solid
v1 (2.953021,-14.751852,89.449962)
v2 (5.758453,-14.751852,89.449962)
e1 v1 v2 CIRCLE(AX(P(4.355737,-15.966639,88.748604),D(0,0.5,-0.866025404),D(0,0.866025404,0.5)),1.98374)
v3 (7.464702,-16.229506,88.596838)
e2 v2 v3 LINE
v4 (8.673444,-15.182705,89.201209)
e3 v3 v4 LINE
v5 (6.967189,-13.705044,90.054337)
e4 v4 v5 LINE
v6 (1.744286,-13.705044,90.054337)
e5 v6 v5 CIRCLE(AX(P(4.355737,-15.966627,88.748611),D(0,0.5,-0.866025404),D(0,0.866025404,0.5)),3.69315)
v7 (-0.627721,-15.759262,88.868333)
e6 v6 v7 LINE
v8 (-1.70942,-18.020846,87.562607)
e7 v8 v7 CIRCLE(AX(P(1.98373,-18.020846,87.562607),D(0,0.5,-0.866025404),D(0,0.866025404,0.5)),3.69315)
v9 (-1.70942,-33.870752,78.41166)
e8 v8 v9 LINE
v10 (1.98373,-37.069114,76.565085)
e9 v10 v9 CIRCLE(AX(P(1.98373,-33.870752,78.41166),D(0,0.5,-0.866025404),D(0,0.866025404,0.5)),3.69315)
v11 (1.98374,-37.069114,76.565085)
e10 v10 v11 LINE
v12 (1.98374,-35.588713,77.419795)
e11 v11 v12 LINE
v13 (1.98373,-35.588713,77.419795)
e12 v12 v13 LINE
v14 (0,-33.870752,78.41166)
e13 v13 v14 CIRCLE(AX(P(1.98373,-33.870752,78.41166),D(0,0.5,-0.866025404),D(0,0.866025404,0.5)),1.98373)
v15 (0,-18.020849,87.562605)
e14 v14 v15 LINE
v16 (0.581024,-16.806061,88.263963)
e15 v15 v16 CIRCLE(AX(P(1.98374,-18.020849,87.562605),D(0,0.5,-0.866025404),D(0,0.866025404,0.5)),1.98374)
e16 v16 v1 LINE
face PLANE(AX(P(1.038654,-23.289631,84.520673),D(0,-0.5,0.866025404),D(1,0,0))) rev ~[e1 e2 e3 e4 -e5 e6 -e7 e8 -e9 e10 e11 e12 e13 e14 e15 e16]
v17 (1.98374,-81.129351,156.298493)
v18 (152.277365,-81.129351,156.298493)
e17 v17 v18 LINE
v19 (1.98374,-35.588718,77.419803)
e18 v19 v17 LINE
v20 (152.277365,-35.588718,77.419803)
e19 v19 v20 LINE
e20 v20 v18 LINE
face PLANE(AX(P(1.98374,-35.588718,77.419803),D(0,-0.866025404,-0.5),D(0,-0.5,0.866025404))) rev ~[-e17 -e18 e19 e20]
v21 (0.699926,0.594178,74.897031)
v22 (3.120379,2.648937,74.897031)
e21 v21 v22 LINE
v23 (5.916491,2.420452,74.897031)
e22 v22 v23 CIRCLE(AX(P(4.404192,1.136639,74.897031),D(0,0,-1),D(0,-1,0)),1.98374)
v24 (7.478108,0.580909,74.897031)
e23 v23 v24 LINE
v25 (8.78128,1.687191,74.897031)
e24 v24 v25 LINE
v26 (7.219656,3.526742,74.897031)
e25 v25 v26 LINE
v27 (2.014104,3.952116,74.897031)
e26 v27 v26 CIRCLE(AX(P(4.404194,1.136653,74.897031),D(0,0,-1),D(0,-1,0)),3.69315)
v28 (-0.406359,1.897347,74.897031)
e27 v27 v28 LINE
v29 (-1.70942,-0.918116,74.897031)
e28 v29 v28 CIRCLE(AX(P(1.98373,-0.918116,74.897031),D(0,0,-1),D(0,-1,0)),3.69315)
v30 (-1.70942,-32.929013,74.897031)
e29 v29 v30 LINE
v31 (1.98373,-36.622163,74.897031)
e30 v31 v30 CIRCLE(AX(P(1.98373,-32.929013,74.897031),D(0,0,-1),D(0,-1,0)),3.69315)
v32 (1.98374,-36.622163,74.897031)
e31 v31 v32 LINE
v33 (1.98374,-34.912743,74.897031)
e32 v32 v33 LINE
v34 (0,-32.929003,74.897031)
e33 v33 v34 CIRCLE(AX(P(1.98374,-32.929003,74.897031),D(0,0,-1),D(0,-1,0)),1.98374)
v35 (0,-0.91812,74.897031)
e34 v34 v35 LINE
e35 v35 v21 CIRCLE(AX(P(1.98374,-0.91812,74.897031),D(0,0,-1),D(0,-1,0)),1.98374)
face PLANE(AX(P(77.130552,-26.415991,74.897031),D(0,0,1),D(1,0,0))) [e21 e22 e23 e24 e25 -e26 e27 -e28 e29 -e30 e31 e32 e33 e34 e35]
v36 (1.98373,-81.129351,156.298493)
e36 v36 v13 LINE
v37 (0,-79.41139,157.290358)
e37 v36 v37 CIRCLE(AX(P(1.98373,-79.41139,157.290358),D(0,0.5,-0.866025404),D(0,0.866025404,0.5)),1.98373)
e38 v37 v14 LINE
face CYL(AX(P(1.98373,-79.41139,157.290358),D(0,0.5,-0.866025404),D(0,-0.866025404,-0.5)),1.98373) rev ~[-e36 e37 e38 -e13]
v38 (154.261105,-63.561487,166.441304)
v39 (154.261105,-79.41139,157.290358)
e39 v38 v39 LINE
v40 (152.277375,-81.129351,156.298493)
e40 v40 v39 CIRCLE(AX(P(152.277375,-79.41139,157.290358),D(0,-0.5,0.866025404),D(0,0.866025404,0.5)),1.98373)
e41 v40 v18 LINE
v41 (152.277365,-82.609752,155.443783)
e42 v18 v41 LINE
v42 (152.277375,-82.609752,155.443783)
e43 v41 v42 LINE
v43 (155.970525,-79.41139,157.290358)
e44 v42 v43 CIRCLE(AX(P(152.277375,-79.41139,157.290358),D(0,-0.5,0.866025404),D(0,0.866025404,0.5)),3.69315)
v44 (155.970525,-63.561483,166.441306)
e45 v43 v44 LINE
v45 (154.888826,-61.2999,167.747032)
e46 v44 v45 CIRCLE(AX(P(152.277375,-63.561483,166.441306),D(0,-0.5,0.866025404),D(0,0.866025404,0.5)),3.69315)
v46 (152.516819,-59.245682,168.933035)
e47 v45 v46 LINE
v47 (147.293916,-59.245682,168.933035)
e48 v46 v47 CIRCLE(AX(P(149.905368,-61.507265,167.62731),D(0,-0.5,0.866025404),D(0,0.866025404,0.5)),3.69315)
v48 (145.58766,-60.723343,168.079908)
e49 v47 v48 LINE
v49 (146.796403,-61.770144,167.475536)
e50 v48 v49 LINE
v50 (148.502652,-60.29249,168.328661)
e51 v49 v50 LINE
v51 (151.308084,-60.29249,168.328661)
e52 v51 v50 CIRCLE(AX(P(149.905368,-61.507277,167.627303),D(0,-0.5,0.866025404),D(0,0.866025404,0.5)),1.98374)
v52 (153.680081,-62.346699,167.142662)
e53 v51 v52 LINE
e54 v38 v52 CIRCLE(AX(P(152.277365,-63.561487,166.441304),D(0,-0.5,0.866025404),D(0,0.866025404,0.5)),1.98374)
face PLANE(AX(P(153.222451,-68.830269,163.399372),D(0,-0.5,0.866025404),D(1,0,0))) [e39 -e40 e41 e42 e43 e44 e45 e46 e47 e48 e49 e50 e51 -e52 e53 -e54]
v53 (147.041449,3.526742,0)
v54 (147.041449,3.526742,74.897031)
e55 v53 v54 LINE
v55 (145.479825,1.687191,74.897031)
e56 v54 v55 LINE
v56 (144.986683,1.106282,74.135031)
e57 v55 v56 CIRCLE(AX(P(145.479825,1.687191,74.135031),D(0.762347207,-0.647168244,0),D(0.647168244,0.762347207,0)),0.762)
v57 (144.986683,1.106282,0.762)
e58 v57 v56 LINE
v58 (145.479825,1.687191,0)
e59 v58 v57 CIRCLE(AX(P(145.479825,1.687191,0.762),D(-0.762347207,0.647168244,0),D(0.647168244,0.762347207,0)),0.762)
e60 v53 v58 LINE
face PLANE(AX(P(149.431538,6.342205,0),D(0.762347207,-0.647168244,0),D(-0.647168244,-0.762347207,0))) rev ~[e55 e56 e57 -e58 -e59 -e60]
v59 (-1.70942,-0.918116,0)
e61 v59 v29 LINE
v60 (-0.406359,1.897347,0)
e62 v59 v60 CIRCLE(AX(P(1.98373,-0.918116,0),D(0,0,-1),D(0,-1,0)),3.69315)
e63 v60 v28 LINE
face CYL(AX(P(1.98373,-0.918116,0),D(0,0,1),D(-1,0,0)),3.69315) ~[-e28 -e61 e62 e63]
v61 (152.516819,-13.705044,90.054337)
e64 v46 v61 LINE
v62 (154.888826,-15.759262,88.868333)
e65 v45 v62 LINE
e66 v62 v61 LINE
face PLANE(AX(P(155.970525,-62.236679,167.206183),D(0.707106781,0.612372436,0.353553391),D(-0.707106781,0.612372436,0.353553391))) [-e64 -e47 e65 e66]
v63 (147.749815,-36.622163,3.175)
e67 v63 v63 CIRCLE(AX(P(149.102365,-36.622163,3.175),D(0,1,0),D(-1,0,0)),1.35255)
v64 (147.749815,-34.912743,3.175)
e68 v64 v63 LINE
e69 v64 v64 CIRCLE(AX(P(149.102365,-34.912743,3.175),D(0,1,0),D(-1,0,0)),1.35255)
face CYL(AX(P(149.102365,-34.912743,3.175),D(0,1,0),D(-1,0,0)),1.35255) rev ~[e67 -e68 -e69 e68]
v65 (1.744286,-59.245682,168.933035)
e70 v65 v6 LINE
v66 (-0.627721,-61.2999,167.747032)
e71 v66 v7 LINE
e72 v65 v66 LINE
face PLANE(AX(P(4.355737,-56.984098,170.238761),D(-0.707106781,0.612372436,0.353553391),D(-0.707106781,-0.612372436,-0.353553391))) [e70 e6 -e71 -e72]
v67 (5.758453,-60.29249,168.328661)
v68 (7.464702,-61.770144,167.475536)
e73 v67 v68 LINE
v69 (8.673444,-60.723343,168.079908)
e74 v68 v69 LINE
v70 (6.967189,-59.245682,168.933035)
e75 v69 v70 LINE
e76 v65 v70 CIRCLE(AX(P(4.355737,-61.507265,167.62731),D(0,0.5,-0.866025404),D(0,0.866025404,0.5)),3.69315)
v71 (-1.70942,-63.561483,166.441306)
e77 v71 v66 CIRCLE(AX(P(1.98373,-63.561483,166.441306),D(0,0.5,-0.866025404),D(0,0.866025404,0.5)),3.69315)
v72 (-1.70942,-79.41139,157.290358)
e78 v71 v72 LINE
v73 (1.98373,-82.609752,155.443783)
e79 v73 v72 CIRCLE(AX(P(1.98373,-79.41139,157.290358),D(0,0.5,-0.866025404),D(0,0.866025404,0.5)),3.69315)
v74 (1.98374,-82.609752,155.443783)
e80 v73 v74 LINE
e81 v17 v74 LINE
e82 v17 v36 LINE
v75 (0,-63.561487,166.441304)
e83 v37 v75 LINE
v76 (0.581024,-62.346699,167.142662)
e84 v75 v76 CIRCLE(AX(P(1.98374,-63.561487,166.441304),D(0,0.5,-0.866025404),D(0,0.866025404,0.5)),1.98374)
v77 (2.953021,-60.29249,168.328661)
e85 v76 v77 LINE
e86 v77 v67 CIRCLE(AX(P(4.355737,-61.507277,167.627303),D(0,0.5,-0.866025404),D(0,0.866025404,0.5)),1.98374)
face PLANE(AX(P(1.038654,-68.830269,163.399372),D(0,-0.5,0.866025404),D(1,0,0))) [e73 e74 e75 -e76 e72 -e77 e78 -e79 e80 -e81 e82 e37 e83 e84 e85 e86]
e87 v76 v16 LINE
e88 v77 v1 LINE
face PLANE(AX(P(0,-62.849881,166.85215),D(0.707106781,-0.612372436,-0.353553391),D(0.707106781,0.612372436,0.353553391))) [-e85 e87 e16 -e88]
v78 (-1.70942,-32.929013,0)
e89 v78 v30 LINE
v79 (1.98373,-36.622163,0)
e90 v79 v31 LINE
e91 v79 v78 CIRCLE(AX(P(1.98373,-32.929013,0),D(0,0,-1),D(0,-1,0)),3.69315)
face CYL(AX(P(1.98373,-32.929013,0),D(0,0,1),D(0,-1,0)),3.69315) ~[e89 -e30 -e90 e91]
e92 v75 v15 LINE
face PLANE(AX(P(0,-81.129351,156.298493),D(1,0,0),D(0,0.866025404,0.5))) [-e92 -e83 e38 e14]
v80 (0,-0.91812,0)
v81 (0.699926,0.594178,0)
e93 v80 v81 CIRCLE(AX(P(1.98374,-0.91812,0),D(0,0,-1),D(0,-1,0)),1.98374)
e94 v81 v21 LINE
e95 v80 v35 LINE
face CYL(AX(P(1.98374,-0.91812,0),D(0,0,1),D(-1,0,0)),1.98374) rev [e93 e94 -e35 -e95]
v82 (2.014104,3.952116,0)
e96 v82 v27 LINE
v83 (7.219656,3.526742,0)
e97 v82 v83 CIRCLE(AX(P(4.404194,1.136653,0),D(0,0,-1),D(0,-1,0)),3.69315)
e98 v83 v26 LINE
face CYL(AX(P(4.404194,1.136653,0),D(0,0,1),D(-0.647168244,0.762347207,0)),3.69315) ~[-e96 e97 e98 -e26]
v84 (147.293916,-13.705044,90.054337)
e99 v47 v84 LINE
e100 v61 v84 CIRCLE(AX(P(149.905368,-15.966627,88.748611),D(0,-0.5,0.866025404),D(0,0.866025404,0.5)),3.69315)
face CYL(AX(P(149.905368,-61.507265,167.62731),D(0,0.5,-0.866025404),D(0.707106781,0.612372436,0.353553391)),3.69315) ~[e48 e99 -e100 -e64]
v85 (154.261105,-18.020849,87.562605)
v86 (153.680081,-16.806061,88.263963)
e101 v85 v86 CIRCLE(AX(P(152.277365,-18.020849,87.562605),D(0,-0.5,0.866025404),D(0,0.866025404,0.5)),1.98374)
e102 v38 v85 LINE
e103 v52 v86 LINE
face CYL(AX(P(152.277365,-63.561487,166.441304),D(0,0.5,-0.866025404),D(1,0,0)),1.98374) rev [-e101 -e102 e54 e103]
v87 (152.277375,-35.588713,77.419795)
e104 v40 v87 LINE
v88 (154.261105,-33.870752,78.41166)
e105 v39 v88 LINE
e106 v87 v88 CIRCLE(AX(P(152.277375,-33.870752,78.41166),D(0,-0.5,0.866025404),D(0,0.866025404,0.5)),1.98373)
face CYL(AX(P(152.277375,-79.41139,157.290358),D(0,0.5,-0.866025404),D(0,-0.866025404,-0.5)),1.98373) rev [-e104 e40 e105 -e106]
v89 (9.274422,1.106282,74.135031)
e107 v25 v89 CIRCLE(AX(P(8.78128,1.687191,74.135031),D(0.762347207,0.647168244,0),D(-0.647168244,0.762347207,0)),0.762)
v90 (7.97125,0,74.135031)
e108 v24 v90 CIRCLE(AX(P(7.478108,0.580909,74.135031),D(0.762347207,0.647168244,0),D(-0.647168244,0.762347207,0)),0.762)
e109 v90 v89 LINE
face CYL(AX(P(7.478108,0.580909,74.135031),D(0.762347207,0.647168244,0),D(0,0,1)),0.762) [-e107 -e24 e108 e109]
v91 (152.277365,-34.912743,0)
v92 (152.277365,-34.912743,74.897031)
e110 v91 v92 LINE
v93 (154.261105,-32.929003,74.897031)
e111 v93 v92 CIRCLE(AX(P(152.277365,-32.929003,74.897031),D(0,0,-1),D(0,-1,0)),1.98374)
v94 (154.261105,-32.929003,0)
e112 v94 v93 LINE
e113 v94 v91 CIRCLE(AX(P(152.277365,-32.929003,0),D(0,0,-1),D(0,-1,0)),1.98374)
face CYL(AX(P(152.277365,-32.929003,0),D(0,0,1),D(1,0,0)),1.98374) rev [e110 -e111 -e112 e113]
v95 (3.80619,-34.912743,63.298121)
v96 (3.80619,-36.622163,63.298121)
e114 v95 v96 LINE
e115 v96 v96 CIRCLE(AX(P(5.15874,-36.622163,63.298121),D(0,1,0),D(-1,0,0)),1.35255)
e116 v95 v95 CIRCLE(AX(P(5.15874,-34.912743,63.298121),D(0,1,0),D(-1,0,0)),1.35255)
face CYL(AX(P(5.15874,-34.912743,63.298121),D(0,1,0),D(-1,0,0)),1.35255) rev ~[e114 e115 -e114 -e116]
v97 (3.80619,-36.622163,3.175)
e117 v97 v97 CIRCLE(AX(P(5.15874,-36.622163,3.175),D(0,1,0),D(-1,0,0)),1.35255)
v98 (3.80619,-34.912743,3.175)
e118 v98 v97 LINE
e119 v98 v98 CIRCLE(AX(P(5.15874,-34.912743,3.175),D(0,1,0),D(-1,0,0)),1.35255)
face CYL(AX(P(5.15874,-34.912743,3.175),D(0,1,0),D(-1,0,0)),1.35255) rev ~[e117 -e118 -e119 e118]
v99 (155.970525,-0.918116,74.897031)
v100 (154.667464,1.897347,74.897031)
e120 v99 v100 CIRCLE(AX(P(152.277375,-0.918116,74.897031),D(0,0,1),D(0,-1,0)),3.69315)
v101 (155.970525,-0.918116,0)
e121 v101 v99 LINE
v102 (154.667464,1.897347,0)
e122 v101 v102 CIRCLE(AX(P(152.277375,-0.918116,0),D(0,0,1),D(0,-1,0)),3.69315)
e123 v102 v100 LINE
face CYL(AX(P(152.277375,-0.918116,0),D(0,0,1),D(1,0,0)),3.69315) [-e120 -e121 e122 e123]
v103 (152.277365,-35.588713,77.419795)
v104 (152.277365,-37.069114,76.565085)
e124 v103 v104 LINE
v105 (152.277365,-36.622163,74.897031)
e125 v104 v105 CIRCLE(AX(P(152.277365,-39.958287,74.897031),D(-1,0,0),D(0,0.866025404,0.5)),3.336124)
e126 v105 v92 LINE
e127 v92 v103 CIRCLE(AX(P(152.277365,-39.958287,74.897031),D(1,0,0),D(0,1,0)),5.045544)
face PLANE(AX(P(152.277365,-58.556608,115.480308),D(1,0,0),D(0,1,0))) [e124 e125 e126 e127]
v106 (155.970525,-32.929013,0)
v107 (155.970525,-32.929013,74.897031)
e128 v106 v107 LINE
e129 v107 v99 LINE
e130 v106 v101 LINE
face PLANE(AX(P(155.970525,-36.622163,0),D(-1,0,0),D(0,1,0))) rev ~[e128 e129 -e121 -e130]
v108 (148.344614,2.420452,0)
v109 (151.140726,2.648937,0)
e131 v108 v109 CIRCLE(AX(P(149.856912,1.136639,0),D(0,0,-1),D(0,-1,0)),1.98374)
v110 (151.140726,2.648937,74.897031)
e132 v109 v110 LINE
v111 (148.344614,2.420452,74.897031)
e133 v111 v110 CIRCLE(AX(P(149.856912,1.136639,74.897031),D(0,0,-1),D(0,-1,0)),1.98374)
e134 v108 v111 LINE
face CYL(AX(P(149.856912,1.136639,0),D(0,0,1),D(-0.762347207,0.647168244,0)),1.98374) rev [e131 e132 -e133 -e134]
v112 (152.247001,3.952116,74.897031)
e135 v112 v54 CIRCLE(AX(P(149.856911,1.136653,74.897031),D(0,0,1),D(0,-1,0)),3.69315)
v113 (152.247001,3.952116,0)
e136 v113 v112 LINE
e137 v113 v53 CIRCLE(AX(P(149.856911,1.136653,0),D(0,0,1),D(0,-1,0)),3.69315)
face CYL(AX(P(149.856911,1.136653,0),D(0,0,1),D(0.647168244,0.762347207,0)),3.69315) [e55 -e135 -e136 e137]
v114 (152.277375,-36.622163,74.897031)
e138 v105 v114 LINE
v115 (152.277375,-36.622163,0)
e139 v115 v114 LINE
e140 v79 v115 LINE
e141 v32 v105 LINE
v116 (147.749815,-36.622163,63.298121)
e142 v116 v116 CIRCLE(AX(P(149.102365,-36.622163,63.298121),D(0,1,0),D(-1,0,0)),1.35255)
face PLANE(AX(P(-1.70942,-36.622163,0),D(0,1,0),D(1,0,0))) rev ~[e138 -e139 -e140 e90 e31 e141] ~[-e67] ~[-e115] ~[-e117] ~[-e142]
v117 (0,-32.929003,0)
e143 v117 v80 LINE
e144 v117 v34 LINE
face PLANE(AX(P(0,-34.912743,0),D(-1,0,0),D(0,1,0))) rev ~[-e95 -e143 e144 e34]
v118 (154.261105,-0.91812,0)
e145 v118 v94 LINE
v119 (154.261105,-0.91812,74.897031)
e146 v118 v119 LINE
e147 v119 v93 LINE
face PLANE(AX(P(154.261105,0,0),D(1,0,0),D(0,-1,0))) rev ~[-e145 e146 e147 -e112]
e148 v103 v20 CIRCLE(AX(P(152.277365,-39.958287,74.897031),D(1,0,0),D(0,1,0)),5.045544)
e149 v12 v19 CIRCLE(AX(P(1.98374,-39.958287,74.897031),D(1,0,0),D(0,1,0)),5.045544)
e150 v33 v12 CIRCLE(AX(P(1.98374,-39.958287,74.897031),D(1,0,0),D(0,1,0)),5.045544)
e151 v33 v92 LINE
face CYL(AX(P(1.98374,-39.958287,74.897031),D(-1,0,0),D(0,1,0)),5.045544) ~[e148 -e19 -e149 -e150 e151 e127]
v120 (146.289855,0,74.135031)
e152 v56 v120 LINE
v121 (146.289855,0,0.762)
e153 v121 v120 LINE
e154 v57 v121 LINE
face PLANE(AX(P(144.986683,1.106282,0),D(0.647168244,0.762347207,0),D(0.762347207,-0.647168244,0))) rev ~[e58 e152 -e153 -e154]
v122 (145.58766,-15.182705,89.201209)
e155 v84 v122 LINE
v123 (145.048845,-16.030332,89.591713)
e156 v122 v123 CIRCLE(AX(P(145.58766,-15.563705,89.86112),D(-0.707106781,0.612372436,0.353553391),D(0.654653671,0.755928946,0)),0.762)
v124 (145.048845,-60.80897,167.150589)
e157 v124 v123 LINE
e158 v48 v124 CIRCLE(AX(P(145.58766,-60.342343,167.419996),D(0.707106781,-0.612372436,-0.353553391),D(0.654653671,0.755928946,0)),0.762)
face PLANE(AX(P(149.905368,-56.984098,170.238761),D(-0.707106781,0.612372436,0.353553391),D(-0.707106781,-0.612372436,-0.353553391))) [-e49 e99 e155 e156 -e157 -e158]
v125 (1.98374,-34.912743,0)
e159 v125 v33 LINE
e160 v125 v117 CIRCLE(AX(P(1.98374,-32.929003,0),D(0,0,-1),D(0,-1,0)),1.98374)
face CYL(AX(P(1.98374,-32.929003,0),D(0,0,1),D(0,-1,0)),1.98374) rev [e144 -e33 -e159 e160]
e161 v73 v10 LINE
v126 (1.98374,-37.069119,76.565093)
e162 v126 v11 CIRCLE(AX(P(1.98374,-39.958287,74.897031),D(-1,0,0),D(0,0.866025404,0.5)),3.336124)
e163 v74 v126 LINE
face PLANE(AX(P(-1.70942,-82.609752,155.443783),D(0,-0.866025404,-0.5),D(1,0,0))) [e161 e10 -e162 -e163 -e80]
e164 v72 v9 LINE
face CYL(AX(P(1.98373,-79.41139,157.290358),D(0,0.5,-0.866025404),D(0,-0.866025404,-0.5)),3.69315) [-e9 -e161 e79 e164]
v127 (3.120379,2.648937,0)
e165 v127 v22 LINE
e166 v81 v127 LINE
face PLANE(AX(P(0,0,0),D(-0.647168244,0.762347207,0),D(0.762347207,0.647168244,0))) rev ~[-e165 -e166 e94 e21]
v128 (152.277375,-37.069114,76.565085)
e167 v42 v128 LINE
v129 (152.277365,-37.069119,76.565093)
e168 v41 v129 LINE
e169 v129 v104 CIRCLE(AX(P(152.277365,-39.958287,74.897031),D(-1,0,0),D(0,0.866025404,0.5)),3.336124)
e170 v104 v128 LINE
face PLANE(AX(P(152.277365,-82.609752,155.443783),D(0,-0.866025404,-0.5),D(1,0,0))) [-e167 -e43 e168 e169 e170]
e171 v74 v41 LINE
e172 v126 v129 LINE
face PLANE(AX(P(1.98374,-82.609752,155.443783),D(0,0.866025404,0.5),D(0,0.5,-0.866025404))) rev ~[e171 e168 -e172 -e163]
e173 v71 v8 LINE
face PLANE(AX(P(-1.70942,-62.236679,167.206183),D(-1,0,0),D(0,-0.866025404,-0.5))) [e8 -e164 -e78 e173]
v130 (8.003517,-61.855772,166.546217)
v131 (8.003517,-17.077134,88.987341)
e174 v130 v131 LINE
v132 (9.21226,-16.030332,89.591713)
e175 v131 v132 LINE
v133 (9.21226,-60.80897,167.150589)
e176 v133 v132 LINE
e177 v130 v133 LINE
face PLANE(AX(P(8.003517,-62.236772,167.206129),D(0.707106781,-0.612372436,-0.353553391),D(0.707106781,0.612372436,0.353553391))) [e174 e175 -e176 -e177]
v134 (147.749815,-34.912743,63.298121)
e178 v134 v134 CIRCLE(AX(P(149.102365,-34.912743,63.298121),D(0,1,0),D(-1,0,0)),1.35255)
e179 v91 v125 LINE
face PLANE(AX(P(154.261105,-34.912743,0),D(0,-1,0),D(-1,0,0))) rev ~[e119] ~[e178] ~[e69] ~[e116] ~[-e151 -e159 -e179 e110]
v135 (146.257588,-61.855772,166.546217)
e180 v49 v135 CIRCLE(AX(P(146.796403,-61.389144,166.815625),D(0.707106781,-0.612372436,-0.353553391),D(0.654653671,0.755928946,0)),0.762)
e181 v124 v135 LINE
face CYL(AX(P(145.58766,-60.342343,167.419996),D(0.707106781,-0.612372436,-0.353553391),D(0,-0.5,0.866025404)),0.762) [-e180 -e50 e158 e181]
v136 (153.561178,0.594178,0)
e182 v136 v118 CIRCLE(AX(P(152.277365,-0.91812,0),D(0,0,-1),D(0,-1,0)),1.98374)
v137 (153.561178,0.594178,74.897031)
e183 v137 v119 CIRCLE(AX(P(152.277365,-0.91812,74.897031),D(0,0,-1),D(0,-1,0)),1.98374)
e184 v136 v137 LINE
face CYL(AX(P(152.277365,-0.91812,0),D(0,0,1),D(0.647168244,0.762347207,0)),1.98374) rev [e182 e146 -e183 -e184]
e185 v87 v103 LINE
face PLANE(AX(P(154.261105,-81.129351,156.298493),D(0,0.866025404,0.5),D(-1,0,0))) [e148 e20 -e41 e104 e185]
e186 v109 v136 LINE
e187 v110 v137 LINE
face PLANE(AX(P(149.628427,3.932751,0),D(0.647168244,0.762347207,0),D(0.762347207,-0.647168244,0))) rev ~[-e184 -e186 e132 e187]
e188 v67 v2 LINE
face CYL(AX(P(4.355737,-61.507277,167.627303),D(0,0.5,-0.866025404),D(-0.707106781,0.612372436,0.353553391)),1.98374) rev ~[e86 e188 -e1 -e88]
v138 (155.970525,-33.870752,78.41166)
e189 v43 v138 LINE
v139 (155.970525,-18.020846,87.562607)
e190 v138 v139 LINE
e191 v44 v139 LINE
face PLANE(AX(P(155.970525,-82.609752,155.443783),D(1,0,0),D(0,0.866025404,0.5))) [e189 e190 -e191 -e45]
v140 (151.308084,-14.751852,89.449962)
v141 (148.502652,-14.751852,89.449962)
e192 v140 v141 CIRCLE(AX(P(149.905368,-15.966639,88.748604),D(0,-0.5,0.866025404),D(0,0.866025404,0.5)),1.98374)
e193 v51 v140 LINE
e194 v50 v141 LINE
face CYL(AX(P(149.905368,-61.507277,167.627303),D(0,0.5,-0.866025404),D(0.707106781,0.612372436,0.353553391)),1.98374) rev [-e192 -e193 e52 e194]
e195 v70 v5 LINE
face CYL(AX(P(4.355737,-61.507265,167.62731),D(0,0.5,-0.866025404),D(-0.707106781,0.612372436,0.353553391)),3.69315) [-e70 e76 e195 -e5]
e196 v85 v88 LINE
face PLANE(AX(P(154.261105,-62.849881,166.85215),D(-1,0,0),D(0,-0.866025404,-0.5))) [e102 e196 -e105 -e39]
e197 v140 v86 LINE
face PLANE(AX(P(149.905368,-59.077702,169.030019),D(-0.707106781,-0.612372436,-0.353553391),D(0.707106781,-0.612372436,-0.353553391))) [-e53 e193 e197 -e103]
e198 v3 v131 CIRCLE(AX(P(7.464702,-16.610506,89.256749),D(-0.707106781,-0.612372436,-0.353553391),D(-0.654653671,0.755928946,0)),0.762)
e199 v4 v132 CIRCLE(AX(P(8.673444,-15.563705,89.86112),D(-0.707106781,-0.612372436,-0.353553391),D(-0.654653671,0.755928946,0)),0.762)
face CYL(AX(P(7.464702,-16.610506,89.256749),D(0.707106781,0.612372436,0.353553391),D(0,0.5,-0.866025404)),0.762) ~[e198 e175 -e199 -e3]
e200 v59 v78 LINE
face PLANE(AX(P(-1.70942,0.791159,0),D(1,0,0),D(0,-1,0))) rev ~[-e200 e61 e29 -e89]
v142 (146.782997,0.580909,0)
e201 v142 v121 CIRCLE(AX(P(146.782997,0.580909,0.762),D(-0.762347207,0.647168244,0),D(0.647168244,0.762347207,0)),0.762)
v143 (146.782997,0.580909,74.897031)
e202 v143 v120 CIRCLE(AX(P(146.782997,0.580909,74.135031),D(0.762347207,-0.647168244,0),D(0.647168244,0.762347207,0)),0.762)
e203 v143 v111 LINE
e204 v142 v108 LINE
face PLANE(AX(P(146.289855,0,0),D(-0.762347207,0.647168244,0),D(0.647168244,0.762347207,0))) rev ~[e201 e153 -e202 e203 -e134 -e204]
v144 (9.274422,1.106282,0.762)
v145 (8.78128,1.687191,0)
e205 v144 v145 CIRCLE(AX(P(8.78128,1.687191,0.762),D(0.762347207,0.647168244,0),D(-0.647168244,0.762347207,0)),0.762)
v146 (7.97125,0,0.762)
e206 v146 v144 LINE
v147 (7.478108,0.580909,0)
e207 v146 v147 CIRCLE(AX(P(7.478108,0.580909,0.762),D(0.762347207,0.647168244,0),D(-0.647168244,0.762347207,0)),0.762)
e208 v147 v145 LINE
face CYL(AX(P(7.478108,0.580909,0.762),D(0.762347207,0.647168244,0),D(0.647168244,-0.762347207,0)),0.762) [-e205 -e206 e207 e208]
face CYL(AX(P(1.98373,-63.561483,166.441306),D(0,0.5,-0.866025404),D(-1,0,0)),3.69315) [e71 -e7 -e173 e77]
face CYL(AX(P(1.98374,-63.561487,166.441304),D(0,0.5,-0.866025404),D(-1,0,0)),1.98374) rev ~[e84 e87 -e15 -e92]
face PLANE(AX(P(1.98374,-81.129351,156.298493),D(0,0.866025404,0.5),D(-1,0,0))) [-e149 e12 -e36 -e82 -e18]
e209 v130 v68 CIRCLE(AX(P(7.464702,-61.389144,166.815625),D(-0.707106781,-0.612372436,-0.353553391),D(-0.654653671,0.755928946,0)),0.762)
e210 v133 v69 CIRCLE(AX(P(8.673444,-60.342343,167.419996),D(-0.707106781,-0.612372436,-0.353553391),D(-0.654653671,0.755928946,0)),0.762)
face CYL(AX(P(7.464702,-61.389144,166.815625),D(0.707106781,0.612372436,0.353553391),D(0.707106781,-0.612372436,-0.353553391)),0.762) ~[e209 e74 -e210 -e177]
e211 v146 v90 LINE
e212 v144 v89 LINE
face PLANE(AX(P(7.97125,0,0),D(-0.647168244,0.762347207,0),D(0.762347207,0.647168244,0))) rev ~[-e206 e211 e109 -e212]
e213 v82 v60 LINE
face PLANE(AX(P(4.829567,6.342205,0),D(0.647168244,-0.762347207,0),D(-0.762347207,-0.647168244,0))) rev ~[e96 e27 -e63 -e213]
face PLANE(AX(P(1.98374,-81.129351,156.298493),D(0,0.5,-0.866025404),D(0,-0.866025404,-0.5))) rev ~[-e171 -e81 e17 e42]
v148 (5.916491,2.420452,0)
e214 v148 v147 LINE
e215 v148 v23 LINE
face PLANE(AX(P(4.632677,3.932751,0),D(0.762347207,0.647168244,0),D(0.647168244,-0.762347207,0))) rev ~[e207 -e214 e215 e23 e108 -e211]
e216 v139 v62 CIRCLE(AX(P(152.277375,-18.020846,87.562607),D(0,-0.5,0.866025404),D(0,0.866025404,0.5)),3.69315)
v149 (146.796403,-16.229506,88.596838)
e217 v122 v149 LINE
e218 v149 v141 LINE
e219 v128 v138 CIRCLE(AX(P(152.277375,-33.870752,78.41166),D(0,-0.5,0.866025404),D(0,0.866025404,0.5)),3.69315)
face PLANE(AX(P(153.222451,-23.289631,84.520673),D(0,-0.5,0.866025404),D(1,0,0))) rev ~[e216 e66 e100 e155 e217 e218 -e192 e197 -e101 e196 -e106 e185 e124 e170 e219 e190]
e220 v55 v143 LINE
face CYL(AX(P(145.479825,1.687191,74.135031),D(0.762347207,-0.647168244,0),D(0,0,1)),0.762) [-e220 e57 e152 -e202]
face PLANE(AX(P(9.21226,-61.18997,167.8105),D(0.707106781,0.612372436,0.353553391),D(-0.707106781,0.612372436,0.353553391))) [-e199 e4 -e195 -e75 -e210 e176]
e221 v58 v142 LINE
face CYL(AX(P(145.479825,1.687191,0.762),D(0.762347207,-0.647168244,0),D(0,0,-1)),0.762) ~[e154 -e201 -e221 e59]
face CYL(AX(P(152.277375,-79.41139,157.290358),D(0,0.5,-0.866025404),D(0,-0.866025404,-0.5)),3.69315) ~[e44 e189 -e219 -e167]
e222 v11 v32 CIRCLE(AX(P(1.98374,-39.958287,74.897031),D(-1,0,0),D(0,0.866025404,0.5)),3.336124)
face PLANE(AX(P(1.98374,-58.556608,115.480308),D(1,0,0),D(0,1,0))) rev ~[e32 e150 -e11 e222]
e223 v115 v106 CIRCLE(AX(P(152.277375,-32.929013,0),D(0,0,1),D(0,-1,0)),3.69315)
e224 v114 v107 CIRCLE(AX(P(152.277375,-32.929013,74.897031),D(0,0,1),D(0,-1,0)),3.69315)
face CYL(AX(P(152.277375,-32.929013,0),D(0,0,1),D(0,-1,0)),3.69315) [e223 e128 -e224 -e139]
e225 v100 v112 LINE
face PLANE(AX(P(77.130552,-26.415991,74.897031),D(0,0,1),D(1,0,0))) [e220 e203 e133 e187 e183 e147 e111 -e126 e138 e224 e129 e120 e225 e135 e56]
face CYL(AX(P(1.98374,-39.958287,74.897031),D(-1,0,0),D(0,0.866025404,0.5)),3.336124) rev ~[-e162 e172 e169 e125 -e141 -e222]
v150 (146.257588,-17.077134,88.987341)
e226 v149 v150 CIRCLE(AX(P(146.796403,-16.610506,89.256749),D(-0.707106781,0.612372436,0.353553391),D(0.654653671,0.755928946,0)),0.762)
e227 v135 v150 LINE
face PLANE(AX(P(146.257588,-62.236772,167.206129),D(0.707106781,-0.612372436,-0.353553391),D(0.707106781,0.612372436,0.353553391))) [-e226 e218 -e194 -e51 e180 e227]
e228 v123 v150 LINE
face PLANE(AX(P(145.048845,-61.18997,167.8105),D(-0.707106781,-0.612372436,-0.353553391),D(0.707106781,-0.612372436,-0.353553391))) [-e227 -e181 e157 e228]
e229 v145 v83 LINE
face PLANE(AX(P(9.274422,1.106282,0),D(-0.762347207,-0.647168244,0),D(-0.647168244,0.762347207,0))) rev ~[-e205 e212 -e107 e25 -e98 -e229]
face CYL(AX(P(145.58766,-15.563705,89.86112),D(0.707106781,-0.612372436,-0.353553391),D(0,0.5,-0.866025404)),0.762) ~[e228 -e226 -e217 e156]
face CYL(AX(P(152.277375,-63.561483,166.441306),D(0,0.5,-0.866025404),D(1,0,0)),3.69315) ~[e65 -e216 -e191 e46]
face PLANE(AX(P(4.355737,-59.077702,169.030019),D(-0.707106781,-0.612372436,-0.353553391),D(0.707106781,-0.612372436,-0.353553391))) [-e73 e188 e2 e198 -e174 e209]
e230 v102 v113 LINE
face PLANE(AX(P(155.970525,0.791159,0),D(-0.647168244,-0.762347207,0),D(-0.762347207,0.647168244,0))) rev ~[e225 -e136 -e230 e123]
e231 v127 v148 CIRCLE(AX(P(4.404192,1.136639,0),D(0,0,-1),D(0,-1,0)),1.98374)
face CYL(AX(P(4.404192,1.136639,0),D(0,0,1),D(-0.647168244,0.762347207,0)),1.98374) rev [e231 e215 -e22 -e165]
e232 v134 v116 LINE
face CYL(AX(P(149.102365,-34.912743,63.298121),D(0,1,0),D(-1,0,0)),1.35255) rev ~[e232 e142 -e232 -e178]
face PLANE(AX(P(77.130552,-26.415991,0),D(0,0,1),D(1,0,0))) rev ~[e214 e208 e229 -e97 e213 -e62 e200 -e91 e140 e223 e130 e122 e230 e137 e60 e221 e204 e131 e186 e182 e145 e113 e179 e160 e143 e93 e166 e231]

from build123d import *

# Parameters (mm, degrees)
F1_DEPTH  = 74.8970308
F2_R      = 1.35255
F3_DEPTH  = 1.70942
F8_DEPTH  = 150.2936248359
F10_DEPTH = 91.0812758
F11_R     = 3.69315
F12_R     = 1.98373
F12_R_2   = 1.98374
F13_R     = 0.762


# Not quite as in the source:
# - a fillet or chamfer is up to 0.001 mm smaller than in the source, because OpenCascade refuses the exact size


with BuildPart() as f1:
    # F0 (on Top) → F1 (new body)
    with BuildSketch(Plane.XY):
        Polygon((0, -34.9127429517), (0, 0), (4.6326774961, 3.932751029), (7.9712502047, 0), (9.2744217668, 1.1062823402), (4.8295667179, 6.3422049313), (-1.70942, 0.7911587457), (-1.70942, -36.6221629517), (155.9705248359, -36.6221629517), (155.9705248359, 0.7911587457), (149.4315381179, 6.3422049313), (144.9866830691, 1.1062823402), (146.2898546311, 0), (149.6284273398, 3.932751029), (154.2611048359, 0), (154.2611048359, -34.9127429517), align=None)
    extrude(amount=F1_DEPTH)

    # F2 (on face) → F3 (cut, through all)
    with BuildSketch(Plane(origin=(0, -34.9127429517, 0), x_dir=(-1, 0, 0), z_dir=(0, 1, 0))):
        with Locations((-5.15874, 3.175)):
            Circle(F2_R)
        with Locations((-5.15874, 63.2981208)):
            Circle(F2_R)
        with Locations((-149.1023648359, 63.2981208)):
            Circle(F2_R)
        with Locations((-149.1023648359, 3.175)):
            Circle(F2_R)
    extrude(amount=-F3_DEPTH, mode=Mode.SUBTRACT)

    # F7 (on offset) → F8 (join, through all)
    with BuildSketch(Plane.YZ.offset(1.98374)):
        with BuildLine():
            Line((-36.6221629517, 74.8970308), (-34.9127429517, 74.8970308))
            ThreePointArc((-34.9127429517, 74.8970308), (-35.0846656967, 76.2029136969), (-35.5887176805, 77.4198028324))
            Line((-35.5887176805, 77.4198028324), (-81.129350806, 156.2984932146))
            Line((-81.129350806, 156.2984932146), (-82.6097519517, 155.4437832146))
            Line((-82.6097519517, 155.4437832146), (-37.0691188262, 76.5650928324))
            ThreePointArc((-37.0691188262, 76.5650928324), (-36.7358386226, 75.7604832448), (-36.6221629517, 74.8970308))
        make_face()
    extrude(amount=F8_DEPTH)

    # F9 (on face) → F10 (join)
    with BuildSketch(Plane(origin=(0, -87.96157055, 152.3539093062), x_dir=(1, 0, 0), z_dir=(0, -0.5, 0.8660254038))):
        Polygon((-1.7094199999, 6.1797478168), (1.98374, 6.1797478168), (1.98374, 7.8891678168), (0, 7.8891678168), (1e-10, 28.9964815425), (4.3557372213, 33.3522187635), (8.0035172575, 29.7044387269), (9.2122597315, 30.9131812007), (4.3557372215, 35.7697037112), (-1.7094199999, 29.7045464903), align=None)
        Polygon((152.277364836, 7.8891678168), (152.277364836, 6.1797478168), (155.9705248359, 6.1797478168), (155.9705248359, 29.7045464903), (149.9053676148, 35.7697037114), (145.0488451045, 30.9131812012), (146.2575875784, 29.7044387273), (149.9053676148, 33.3522187636), (154.2611048359, 28.9964815425), (154.2611048359, 7.8891678168), align=None)
    extrude(amount=-F10_DEPTH)

    # F11 (radius 3.69316 in the source; OpenCascade refuses exactly that, so slightly less here)
    f11_edges = [f1.edges().sort_by_distance(p)[0] for p in [
        (149.431538, 6.342205, 37.448515),
        (155.970525, 0.791159, 37.448515),
        (155.970525, -36.622163, 37.448515),
        (-1.70942, -36.622163, 37.448515),
        (-1.70942, 0.791159, 37.448515),
        (4.829567, 6.342205, 37.448515),
        (149.905368, -34.21378, 130.799412),
        (155.970525, -39.46636, 127.766833),
        (155.970525, -59.839433, 116.004434),
        (-1.70942, -59.839433, 116.004434),
        (-1.70942, -39.46636, 127.766833),
        (4.355737, -34.21378, 130.799412),
    ]]
    fillet(f11_edges, radius=F11_R)

    # F12#9 (call 1 of 12: OpenCascade refuses the feature's edges together) (radius 1.98374 in the source; OpenCascade refuses exactly that, so slightly less here)
    f12_9_edges = [f1.edges().sort_by_distance(p)[0] for p in [
        (0, -58.359032, 116.859144),
    ]]
    fillet(f12_9_edges, radius=F12_R)

    # F12#10 (call 2 of 12) (radius 1.98374 in the source; OpenCascade refuses exactly that, so slightly less here)
    f12_10_edges = [f1.edges().sort_by_distance(p)[0] for p in [
        (154.261105, -58.359032, 116.859144),
    ]]
    fillet(f12_10_edges, radius=F12_R)

    # F12#11 (call 3 of 12)
    f12_11_edges = [f1.edges().sort_by_distance(p)[0] for p in [
        (154.261105, -40.079562, 127.412801),
    ]]
    fillet(f12_11_edges, radius=F12_R_2)

    # F12#12 (call 4 of 12)
    f12_12_edges = [f1.edges().sort_by_distance(p)[0] for p in [
        (149.905368, -36.307383, 129.590669),
    ]]
    fillet(f12_12_edges, radius=F12_R_2)

    # F12 (call 5 of 12)
    f12_edges = [f1.edges().sort_by_distance(p)[0] for p in [
        (149.628427, 3.932751, 37.448515),
    ]]
    fillet(f12_edges, radius=F12_R_2)

    # F12#2 (call 6 of 12)
    f12_2_edges = [f1.edges().sort_by_distance(p)[0] for p in [
        (154.261105, 0, 37.448515),
    ]]
    fillet(f12_2_edges, radius=F12_R_2)

    # F12#3 (call 7 of 12)
    f12_3_edges = [f1.edges().sort_by_distance(p)[0] for p in [
        (154.261105, -34.912743, 37.448515),
    ]]
    fillet(f12_3_edges, radius=F12_R_2)

    # F12#4 (call 8 of 12)
    f12_4_edges = [f1.edges().sort_by_distance(p)[0] for p in [
        (0, -34.912743, 37.448515),
    ]]
    fillet(f12_4_edges, radius=F12_R_2)

    # F12#5 (call 9 of 12)
    f12_5_edges = [f1.edges().sort_by_distance(p)[0] for p in [
        (0, 0, 37.448515),
    ]]
    fillet(f12_5_edges, radius=F12_R_2)

    # F12#6 (call 10 of 12)
    f12_6_edges = [f1.edges().sort_by_distance(p)[0] for p in [
        (4.632677, 3.932751, 37.448515),
    ]]
    fillet(f12_6_edges, radius=F12_R_2)

    # F12#7 (call 11 of 12)
    f12_7_edges = [f1.edges().sort_by_distance(p)[0] for p in [
        (0, -40.079562, 127.412801),
    ]]
    fillet(f12_7_edges, radius=F12_R_2)

    # F12#8 (call 12 of 12)
    f12_8_edges = [f1.edges().sort_by_distance(p)[0] for p in [
        (4.355737, -36.307383, 129.590669),
    ]]
    fillet(f12_8_edges, radius=F12_R_2)

    # F13
    f13_edges = [f1.edges().sort_by_distance(p)[0] for p in [
        (145.638269, 0.553141, 74.897031),
        (145.638269, 0.553141, 0),
        (8.622836, 0.553141, 0),
        (8.622836, 0.553141, 74.897031),
        (8.607888, -61.713371, 167.508314),
        (8.607888, -16.172733, 88.629616),
        (145.653216, -16.172733, 88.629616),
        (145.653216, -61.713371, 167.508314),
    ]]
    fillet(f13_edges, radius=F13_R)


solid = f1.part
